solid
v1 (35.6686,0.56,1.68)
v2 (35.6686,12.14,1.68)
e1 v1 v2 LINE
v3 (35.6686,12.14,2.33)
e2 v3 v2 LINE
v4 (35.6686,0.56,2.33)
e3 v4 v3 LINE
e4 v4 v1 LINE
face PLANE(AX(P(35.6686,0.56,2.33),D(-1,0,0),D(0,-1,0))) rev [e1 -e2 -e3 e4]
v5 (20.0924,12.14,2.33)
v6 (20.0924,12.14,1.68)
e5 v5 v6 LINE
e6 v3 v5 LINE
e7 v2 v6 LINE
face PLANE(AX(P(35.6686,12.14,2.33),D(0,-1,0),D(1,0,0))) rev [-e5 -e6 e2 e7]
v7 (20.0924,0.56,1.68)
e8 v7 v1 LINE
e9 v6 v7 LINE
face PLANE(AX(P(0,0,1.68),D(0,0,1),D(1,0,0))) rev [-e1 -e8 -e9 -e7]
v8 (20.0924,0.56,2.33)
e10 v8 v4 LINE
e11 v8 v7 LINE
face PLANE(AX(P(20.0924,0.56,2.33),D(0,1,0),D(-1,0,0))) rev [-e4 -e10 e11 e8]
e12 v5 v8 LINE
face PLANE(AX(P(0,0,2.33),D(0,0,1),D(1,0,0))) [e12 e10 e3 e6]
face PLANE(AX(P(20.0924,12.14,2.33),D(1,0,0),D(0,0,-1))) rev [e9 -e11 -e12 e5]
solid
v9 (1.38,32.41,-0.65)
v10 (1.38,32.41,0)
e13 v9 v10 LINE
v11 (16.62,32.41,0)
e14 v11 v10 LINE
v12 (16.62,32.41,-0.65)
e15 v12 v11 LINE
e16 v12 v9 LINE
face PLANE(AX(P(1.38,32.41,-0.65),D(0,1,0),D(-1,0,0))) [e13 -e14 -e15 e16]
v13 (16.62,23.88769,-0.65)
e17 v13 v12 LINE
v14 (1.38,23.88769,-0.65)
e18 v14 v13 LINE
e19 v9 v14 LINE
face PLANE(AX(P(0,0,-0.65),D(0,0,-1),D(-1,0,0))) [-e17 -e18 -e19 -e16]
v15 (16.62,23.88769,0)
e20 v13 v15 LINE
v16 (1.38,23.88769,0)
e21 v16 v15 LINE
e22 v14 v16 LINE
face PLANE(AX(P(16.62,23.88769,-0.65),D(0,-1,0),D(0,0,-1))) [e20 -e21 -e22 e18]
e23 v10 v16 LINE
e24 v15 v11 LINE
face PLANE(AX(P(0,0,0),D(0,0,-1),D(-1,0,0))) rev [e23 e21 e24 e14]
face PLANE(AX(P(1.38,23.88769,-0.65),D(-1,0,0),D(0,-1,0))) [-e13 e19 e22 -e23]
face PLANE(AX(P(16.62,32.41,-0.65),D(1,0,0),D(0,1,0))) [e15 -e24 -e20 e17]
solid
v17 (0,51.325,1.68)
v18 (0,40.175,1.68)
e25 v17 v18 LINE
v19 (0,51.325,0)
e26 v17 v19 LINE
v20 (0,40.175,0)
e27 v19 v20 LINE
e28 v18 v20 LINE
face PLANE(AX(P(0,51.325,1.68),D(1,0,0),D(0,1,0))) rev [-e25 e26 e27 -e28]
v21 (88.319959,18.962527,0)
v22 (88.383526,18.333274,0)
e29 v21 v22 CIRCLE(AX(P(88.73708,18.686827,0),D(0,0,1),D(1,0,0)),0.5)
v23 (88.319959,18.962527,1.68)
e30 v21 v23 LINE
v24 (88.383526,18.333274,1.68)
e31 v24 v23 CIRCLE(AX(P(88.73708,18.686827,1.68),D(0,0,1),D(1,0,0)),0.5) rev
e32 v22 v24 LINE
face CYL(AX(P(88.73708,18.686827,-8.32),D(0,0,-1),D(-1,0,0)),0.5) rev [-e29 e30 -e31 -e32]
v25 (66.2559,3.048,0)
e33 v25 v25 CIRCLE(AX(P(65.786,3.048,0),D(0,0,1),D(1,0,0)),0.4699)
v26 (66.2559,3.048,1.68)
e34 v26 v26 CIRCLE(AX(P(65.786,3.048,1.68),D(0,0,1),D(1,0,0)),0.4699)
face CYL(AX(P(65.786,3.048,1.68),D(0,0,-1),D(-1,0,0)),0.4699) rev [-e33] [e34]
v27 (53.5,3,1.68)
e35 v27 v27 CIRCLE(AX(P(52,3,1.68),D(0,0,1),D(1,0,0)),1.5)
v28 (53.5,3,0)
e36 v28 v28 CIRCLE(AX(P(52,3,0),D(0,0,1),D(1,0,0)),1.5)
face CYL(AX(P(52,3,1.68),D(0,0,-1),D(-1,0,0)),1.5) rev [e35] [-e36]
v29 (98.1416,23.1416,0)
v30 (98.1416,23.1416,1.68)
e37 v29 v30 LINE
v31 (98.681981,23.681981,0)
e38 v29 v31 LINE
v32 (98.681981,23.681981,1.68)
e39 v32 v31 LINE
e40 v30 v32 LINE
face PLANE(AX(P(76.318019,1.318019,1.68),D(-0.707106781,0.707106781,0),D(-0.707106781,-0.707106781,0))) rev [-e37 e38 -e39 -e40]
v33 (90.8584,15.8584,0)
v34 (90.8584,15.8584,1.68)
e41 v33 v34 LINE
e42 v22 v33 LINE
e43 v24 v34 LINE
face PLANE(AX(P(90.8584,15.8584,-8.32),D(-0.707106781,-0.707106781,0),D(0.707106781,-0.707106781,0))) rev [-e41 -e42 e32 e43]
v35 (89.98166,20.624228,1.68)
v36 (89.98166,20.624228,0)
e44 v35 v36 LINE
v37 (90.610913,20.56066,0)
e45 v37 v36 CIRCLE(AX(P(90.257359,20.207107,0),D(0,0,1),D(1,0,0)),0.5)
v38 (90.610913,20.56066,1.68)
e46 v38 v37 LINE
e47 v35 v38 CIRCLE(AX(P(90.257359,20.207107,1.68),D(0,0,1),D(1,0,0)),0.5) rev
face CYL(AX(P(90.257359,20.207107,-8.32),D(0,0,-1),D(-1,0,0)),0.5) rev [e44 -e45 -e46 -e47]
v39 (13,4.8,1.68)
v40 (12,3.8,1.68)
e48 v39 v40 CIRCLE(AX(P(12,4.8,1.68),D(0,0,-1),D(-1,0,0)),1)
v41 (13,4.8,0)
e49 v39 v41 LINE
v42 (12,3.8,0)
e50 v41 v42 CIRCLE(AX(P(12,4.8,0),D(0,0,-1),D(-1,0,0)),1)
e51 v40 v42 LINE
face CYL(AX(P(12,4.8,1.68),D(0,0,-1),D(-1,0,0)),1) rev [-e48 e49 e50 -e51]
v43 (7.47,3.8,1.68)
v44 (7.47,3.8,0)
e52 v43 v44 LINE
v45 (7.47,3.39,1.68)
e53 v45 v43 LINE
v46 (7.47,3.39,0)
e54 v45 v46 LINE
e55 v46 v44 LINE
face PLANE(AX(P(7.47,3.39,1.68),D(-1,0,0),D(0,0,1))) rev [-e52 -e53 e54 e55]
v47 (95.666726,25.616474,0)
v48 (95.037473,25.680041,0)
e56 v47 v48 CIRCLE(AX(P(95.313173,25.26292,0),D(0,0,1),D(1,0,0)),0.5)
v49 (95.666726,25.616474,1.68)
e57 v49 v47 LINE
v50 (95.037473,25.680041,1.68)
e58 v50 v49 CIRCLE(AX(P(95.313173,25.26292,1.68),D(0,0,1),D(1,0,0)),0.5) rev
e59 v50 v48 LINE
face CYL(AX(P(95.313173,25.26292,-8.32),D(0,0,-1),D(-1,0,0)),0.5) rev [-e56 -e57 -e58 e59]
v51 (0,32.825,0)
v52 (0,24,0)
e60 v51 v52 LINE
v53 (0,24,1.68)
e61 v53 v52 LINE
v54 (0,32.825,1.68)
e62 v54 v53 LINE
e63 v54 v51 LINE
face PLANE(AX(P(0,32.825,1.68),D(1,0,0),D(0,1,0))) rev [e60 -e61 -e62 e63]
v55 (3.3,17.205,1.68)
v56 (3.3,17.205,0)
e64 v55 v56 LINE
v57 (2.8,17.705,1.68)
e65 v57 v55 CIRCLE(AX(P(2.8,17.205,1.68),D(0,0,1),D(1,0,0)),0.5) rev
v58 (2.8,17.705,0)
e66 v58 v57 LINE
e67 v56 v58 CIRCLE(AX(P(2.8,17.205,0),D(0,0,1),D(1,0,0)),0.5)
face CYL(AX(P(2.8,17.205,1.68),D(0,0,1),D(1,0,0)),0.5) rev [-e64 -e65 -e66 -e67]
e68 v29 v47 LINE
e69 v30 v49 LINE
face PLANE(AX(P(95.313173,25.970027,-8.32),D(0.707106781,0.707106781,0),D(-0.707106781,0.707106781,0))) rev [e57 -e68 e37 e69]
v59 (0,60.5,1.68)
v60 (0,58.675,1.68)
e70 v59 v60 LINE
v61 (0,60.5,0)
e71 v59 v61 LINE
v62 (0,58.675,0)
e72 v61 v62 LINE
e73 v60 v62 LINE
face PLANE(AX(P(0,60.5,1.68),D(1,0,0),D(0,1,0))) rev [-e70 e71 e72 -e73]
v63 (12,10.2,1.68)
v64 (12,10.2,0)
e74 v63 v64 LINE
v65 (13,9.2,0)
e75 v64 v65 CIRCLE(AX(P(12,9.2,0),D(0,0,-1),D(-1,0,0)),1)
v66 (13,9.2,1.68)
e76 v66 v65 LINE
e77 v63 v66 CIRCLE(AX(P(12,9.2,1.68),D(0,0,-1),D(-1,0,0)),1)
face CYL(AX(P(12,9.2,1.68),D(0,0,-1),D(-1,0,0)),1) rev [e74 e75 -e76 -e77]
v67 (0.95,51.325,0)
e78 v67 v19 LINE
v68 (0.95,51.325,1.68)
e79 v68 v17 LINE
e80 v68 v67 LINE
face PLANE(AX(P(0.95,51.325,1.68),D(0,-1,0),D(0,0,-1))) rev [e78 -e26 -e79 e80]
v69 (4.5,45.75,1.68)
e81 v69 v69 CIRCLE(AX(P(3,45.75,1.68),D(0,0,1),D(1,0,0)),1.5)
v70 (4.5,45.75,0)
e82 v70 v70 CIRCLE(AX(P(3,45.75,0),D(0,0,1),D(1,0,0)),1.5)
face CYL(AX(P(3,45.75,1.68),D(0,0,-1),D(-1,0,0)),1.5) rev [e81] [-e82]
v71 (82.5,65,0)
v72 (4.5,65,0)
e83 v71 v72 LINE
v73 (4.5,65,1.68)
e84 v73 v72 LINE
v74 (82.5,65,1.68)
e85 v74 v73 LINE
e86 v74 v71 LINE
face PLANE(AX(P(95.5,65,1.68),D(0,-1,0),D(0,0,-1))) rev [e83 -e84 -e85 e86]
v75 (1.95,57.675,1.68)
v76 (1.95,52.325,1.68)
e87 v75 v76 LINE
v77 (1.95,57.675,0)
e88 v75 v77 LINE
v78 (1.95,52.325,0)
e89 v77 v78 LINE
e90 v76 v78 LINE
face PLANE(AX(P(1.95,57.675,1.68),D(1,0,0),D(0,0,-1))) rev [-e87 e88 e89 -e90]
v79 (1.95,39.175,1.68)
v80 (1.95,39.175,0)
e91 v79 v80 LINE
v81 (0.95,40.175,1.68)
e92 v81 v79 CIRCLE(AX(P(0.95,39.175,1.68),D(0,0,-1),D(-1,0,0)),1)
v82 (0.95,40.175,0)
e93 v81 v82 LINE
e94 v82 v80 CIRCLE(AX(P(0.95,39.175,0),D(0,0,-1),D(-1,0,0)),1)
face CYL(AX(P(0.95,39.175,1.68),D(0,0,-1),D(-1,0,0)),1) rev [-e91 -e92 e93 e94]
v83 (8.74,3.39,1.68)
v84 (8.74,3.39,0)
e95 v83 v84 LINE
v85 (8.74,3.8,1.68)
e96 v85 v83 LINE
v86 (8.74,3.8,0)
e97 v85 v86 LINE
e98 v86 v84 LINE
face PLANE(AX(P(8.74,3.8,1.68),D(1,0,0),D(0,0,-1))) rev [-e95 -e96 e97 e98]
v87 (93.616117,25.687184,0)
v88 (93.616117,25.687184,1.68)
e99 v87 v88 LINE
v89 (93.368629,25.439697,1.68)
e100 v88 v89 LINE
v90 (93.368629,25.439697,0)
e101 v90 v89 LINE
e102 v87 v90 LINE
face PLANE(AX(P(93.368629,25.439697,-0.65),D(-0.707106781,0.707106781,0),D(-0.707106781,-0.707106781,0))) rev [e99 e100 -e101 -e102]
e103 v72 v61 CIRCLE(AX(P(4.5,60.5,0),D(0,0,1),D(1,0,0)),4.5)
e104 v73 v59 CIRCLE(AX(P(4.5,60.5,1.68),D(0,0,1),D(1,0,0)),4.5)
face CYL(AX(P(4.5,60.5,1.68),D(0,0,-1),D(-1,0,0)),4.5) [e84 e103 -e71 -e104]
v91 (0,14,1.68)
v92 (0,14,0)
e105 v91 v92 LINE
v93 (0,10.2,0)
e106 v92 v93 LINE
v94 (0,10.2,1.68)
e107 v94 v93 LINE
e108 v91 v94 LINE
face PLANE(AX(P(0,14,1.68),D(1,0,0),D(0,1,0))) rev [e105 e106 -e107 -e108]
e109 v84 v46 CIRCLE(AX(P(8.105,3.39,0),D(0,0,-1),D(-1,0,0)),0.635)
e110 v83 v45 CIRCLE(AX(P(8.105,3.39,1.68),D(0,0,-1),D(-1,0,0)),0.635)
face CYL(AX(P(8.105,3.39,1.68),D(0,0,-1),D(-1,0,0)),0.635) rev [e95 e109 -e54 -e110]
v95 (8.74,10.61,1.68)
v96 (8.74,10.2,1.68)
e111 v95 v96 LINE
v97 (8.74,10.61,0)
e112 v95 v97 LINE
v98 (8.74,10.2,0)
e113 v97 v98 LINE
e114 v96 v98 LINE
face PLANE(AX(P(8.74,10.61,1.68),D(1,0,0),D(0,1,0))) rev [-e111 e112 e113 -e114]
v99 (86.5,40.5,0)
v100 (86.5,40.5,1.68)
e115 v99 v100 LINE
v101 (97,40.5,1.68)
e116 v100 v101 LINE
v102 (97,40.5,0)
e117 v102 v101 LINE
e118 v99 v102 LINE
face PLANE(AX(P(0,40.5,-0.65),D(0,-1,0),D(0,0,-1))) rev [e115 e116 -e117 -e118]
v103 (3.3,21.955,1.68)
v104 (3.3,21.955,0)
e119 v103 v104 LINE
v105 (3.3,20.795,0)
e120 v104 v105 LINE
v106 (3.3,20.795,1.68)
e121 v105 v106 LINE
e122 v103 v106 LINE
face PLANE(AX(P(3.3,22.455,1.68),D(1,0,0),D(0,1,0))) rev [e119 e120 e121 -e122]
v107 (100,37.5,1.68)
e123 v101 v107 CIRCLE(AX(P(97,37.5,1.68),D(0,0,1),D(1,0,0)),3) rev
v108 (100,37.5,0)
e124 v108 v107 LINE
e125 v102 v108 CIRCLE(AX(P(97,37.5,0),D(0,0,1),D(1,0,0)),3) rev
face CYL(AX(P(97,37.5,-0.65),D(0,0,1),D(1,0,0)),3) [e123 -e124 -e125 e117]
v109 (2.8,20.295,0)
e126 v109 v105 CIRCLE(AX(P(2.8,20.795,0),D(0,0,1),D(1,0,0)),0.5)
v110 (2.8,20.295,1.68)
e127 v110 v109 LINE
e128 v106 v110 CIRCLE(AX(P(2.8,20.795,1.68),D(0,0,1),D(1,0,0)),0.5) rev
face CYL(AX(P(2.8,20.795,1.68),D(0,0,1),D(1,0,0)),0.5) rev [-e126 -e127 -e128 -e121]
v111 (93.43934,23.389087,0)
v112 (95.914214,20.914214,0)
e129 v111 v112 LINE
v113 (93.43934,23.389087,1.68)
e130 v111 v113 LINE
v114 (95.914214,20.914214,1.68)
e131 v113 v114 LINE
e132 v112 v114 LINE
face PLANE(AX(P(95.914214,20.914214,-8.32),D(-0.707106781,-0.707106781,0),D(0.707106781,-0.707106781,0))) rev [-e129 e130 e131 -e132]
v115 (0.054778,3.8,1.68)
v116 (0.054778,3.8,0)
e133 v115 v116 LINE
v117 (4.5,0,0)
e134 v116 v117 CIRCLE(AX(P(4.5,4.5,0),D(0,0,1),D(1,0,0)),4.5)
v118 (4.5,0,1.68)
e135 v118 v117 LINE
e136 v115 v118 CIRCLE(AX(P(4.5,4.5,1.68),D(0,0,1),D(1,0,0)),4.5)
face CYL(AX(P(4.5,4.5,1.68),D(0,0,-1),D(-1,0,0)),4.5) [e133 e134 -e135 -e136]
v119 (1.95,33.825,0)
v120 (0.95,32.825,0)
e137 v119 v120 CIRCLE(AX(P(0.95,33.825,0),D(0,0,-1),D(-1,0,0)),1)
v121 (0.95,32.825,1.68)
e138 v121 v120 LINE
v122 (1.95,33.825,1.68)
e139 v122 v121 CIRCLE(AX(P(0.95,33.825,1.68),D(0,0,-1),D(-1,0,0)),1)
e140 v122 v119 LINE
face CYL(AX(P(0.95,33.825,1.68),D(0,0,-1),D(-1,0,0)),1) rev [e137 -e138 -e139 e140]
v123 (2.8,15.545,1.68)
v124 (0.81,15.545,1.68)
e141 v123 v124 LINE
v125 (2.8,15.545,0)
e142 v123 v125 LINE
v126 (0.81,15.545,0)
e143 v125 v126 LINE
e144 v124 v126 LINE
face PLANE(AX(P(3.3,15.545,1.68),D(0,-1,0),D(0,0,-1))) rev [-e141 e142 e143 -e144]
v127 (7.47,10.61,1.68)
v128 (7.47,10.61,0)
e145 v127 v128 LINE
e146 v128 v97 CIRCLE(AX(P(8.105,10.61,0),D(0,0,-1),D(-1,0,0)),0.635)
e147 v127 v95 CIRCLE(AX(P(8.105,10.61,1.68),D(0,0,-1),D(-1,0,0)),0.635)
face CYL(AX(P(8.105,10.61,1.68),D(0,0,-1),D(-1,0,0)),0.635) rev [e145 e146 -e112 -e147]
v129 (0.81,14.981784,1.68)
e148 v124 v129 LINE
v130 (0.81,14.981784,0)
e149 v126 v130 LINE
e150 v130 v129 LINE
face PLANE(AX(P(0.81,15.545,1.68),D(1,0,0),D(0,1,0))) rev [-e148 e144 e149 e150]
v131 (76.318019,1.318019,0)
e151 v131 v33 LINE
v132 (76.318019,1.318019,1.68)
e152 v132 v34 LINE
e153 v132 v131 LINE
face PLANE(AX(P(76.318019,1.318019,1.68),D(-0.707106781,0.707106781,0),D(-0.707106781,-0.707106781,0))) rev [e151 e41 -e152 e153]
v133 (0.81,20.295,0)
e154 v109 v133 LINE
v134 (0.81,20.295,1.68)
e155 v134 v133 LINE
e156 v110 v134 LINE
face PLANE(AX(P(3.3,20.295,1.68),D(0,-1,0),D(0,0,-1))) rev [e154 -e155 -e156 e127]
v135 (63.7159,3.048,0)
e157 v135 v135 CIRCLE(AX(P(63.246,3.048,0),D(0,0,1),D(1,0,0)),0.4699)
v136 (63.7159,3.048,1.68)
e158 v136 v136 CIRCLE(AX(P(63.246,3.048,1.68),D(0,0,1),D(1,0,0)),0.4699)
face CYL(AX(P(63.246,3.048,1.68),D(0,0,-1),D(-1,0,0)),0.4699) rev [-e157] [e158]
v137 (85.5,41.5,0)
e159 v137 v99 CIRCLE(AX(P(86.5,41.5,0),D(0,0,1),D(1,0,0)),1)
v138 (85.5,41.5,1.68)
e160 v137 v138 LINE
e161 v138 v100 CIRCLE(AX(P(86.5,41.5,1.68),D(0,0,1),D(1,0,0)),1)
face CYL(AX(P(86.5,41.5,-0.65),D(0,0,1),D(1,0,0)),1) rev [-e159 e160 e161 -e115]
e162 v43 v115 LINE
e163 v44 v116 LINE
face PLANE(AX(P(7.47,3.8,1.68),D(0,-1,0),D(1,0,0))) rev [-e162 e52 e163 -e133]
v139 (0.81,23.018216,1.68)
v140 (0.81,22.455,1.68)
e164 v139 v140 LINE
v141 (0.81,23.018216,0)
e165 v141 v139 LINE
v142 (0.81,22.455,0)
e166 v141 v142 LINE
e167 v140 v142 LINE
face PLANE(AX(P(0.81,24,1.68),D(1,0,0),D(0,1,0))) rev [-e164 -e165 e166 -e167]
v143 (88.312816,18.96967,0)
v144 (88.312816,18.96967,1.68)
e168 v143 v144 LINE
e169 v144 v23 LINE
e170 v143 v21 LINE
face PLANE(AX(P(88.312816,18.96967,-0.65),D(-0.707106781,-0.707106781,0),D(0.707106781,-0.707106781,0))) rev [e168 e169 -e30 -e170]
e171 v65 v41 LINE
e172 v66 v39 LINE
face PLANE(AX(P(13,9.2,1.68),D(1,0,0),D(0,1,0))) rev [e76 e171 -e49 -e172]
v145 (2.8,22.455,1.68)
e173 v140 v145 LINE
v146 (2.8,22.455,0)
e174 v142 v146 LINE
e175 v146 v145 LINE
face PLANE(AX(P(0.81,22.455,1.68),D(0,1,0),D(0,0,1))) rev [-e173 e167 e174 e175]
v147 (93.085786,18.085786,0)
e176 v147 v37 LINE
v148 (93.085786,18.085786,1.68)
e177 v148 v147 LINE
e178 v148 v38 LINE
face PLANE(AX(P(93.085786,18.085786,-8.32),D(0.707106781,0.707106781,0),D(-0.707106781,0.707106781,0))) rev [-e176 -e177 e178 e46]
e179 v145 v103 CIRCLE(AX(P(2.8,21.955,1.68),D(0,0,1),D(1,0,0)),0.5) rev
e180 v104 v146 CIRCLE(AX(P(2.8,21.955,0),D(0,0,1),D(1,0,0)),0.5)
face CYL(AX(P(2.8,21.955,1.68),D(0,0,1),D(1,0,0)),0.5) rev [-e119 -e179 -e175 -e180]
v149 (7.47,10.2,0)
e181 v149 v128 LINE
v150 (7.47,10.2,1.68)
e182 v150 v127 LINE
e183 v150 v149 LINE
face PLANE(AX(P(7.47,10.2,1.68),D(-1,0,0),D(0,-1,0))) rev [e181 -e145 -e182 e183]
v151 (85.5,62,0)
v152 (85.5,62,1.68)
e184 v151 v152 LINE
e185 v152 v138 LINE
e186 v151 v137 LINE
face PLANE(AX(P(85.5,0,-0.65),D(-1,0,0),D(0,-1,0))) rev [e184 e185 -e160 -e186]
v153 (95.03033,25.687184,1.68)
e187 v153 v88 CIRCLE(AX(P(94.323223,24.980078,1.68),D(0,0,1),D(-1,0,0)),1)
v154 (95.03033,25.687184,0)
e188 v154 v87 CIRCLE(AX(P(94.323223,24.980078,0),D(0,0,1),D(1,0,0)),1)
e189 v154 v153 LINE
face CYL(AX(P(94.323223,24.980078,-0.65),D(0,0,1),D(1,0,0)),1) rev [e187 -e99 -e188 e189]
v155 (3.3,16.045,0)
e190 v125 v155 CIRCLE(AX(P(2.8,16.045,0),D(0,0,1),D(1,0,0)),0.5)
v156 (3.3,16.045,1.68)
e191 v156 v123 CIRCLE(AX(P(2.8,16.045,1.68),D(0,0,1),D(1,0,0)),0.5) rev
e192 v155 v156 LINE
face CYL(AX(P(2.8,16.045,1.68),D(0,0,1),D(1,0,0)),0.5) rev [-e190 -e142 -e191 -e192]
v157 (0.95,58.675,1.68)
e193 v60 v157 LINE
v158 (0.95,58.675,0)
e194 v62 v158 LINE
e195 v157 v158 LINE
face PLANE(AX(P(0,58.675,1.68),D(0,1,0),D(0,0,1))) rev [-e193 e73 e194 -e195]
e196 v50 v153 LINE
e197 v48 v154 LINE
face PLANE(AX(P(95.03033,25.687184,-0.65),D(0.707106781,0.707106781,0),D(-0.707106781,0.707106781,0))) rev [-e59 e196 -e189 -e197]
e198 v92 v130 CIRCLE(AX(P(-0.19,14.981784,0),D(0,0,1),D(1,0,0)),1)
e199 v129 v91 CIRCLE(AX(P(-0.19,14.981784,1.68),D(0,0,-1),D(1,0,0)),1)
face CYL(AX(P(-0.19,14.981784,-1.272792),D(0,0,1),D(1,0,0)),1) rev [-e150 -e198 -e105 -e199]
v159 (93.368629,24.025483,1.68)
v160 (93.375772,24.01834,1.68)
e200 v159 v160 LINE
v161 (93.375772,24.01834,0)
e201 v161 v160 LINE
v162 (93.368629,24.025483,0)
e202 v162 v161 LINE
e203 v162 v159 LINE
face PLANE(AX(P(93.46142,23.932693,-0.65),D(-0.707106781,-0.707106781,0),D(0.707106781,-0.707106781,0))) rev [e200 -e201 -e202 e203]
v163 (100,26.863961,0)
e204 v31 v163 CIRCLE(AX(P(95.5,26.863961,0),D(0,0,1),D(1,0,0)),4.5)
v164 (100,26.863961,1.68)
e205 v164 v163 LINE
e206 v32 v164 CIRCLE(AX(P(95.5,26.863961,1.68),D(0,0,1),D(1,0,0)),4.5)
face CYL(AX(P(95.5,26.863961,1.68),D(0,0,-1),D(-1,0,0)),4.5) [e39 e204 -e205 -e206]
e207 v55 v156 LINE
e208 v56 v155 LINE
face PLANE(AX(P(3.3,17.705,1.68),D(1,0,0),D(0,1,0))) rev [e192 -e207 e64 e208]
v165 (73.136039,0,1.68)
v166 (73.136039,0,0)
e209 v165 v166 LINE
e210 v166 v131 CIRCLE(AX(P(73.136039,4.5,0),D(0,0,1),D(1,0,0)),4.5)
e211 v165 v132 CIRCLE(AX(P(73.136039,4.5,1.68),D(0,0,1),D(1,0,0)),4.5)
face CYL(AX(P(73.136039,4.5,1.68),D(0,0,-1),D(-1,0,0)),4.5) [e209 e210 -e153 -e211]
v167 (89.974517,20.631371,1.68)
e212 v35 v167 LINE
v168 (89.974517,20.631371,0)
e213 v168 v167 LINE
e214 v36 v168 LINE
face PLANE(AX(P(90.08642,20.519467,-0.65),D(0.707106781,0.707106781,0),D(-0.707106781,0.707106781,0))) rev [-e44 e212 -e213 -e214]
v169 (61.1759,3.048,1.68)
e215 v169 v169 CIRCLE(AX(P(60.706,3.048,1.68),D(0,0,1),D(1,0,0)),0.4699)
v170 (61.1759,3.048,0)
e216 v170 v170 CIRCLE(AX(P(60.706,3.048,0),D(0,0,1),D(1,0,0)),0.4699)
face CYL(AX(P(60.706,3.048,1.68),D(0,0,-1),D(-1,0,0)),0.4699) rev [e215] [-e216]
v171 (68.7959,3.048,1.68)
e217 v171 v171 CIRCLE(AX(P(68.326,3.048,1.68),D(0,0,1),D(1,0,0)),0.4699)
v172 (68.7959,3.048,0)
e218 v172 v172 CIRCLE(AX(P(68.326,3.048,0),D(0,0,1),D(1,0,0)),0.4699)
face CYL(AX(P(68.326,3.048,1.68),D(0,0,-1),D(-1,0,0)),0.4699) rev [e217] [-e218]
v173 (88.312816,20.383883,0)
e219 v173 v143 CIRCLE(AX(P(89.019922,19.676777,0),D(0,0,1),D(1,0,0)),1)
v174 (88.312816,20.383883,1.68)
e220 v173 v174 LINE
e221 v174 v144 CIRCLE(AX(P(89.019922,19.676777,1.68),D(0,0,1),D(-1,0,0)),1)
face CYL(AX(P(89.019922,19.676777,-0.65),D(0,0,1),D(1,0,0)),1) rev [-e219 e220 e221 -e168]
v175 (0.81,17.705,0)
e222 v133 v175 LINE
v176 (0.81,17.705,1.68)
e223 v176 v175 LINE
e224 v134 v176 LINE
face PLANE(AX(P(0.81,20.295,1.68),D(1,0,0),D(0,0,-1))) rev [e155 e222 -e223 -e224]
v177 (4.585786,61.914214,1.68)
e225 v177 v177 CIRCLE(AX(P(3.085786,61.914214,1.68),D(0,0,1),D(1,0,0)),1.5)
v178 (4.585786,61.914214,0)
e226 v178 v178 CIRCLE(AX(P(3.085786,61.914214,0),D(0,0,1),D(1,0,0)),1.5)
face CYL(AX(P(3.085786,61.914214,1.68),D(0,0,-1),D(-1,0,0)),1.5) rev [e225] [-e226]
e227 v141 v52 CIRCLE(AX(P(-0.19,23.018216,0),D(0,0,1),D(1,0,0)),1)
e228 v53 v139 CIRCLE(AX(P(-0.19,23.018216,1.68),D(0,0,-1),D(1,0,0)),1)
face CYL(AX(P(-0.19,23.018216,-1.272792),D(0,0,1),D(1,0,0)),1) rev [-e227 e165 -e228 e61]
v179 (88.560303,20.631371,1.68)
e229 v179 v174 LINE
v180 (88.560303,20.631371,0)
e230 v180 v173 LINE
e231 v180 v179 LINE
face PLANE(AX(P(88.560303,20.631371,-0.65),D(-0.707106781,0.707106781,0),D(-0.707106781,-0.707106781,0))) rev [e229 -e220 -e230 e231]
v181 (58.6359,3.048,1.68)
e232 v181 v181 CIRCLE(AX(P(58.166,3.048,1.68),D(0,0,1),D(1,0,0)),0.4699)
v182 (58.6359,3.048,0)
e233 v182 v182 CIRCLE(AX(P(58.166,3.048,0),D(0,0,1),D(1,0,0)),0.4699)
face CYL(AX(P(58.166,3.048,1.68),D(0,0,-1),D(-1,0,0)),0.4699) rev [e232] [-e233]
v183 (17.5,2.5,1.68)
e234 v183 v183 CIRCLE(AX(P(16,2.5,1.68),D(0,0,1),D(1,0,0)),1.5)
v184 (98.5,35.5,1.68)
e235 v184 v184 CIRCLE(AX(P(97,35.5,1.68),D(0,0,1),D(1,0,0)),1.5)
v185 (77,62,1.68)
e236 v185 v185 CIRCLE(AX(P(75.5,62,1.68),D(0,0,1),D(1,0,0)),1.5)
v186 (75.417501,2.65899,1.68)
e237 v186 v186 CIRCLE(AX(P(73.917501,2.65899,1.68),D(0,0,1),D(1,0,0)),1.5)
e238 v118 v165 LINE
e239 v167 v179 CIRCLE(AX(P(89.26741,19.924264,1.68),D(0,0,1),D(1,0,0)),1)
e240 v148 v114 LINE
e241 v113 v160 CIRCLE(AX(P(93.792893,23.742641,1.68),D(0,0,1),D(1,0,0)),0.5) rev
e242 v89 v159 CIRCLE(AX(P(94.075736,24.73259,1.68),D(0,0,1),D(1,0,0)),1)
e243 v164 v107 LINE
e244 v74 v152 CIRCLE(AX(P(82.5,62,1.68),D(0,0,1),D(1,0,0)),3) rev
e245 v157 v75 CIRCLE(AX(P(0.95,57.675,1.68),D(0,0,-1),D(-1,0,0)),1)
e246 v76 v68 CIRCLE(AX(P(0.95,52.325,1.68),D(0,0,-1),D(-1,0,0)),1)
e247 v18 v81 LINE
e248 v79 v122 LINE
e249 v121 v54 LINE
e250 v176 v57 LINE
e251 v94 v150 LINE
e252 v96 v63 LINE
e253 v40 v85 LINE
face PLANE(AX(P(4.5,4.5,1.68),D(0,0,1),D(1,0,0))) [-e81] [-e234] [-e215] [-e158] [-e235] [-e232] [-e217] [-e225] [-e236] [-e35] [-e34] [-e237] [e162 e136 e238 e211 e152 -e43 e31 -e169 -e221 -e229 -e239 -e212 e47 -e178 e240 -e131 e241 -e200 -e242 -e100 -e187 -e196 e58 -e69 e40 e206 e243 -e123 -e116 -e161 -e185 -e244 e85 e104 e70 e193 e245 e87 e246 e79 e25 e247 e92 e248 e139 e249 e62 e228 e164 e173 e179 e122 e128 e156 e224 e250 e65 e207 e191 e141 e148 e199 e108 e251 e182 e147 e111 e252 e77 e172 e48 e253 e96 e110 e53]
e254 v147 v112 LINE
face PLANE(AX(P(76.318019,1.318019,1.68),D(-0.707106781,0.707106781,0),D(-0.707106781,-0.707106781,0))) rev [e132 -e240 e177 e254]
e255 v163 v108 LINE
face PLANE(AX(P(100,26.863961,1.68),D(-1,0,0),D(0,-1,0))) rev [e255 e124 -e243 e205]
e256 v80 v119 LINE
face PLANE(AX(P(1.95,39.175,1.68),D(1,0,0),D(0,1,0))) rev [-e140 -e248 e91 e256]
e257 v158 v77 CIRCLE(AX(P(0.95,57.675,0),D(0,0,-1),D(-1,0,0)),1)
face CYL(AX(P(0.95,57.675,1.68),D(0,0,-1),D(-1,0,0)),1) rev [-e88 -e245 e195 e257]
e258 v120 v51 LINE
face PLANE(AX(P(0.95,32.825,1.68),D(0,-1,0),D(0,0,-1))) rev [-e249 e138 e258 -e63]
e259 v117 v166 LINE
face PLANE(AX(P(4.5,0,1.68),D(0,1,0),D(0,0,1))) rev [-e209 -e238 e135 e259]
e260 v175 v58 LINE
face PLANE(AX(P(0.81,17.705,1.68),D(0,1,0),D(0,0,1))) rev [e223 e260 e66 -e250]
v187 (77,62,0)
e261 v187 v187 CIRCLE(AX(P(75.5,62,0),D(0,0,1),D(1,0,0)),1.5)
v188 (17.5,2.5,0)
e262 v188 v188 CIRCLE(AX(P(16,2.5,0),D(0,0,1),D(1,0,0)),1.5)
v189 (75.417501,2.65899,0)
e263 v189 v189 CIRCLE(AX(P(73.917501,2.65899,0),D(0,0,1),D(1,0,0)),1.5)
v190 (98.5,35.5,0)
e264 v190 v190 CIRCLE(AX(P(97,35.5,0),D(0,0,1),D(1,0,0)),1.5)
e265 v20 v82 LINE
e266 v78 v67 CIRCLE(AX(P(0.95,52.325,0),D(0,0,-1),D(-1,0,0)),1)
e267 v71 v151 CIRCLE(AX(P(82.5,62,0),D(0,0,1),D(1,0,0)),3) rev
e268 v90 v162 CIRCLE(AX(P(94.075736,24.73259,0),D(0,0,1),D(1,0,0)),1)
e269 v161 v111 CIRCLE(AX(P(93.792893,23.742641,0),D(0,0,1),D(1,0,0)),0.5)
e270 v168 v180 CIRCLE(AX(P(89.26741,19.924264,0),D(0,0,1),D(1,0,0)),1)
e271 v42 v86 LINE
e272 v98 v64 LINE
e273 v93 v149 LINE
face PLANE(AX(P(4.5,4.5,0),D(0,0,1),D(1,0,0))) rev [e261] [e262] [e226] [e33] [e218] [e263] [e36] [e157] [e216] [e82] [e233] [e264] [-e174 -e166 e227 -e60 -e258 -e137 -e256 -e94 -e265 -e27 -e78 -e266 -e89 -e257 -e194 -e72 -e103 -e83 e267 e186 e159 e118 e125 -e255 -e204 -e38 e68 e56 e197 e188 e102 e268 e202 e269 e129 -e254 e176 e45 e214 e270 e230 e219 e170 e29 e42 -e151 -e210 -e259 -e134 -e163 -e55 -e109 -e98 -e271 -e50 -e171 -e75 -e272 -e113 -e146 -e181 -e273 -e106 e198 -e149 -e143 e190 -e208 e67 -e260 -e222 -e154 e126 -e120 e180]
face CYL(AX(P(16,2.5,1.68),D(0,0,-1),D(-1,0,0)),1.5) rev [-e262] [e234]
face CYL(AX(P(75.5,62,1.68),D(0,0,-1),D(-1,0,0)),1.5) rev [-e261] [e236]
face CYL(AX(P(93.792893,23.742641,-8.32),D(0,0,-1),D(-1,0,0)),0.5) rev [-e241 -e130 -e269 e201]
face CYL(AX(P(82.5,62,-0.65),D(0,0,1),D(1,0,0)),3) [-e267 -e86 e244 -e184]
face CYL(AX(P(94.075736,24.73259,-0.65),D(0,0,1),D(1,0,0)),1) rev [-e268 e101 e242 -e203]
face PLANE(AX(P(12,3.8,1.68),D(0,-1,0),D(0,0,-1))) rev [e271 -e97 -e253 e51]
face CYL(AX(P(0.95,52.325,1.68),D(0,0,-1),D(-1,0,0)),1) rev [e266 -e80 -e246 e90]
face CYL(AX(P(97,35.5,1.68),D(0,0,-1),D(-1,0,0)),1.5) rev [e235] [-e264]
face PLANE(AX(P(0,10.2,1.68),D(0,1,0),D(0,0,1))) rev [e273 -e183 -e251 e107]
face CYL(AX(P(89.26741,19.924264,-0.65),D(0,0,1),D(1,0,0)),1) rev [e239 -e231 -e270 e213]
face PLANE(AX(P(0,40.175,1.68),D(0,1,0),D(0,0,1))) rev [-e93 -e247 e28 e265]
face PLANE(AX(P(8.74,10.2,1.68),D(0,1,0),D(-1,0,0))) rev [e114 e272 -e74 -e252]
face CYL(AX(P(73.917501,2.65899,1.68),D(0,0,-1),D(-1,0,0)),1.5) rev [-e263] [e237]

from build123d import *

# Parameters (mm, degrees)
BOARD_DEPTH                                   = 1.68
SKETCH2_R                                     = 1.5
SKETCH2_R_2                                   = 0.4699
PLATED_HOLES_DEPTH                            = 120.280435948
SKETCH85_W                                    = 15.24
SKETCH85_H                                    = 8.52231
T4_1_KK81_1_DEPTH                             = 0.65
SKETCH327_W                                   = 15.5762
SKETCH327_H                                   = 11.58
SPEAKER_SMT_WATERPROOF_2403_260_00107_1_DEPTH = 0.65
CUT_EXTRUDE1_DEPTH                            = 120.29136138
CUT_EXTRUDE1_DEPTH_BACK                       = 120.29136138
FILLET1_DEPTH                                 = 1.68
BOSS_EXTRUDE1_DEPTH                           = 1.68
CUT_EXTRUDE5_START                            = -1
CUT_EXTRUDE5_DEPTH                            = 4
CUT_EXTRUDE5_2_DEPTH                          = 1.68


with BuildPart() as part:
    # Sketch1 → BOARD (new body)
    with BuildSketch(Plane.XY):
        with BuildLine():
            Line((4.5, 0), (73.136038969, 0))
            ThreePointArc((73.136038969, 0), (74.858114415, 0.342542104), (76.318019485, 1.318019485))
            Line((76.318019485, 1.318019485), (98.681980515, 23.681980515))
            ThreePointArc((98.681980515, 23.681980515), (99.657457896, 25.141885585), (100, 26.863961031))
            Line((100, 26.863961031), (100, 60.5))
            ThreePointArc((100, 60.5), (98.681980515, 63.681980515), (95.5, 65))
            Line((95.5, 65), (4.5, 65))
            ThreePointArc((4.5, 65), (1.318019485, 63.681980515), (0, 60.5))
            Line((0, 60.5), (0, 58.675))
            Line((0, 58.675), (0.95, 58.675))
            ThreePointArc((0.95, 58.675), (1.657106781, 58.382106781), (1.95, 57.675))
            Line((1.95, 57.675), (1.95, 52.325))
            ThreePointArc((1.95, 52.325), (1.657106781, 51.617893219), (0.95, 51.325))
            Line((0.95, 51.325), (0, 51.325))
            Line((0, 51.325), (0, 40.175))
            Line((0, 40.175), (0.95, 40.175))
            ThreePointArc((0.95, 40.175), (1.657106781, 39.882106781), (1.95, 39.175))
            Line((1.95, 39.175), (1.95, 33.825))
            ThreePointArc((1.95, 33.825), (1.657106781, 33.117893219), (0.95, 32.825))
            Line((0.95, 32.825), (0, 32.825))
            Line((0, 32.825), (0, 24))
            Line((0, 24), (0.81, 24))
            Line((0.81, 24), (0.81, 22.455))
            Line((0.81, 22.455), (3.3, 22.455))
            Line((3.3, 22.455), (3.3, 20.295))
            Line((3.3, 20.295), (0.81, 20.295))
            Line((0.81, 20.295), (0.81, 17.705))
            Line((0.81, 17.705), (3.3, 17.705))
            Line((3.3, 17.705), (3.3, 15.545))
            Line((3.3, 15.545), (0.81, 15.545))
            Line((0.81, 15.545), (0.81, 14))
            Line((0.81, 14), (0, 14))
            Line((0, 14), (0, 10.2))
            Line((0, 10.2), (7.47, 10.2))
            Line((7.47, 10.2), (7.47, 10.61))
            ThreePointArc((7.47, 10.61), (8.105, 11.245), (8.74, 10.61))
            Line((8.74, 10.61), (8.74, 10.2))
            Line((8.74, 10.2), (12, 10.2))
            ThreePointArc((12, 10.2), (12.707106781, 9.907106781), (13, 9.2))
            Line((13, 9.2), (13, 4.8))
            ThreePointArc((13, 4.8), (12.707106781, 4.092893219), (12, 3.8))
            Line((12, 3.8), (8.74, 3.8))
            Line((8.74, 3.8), (8.74, 3.39))
            ThreePointArc((8.74, 3.39), (8.105, 2.755), (7.47, 3.39))
            Line((7.47, 3.39), (7.47, 3.8))
            Line((7.47, 3.8), (0.054777846, 3.8))
            ThreePointArc((0.054777846, 3.8), (1.575961697, 1.079473725), (4.5, 0))
        make_face()
    extrude(amount=BOARD_DEPTH)

    # Sketch2 → PLATED HOLES (cut, through all)
    with BuildSketch(Plane.XY):
        with Locations((97, 35.5)):
            Circle(SKETCH2_R)
        with Locations((65.786, 3.048)):
            Circle(SKETCH2_R_2)
        with Locations((60.706, 3.048)):
            Circle(SKETCH2_R_2)
        with Locations((58.166, 3.048)):
            Circle(SKETCH2_R_2)
        with Locations((63.246, 3.048)):
            Circle(SKETCH2_R_2)
        with Locations((52, 3)):
            Circle(SKETCH2_R)
        with Locations((68.326, 3.048)):
            Circle(SKETCH2_R_2)
        with Locations((16, 2.5)):
            Circle(SKETCH2_R)
        with Locations((73.917501226, 2.658990293)):
            Circle(SKETCH2_R)
        with Locations((3, 45.75)):
            Circle(SKETCH2_R)
        with Locations((3.085786438, 61.914213562)):
            Circle(SKETCH2_R)
        with Locations((75.5, 62)):
            Circle(SKETCH2_R)
    extrude(amount=PLATED_HOLES_DEPTH, mode=Mode.SUBTRACT)

    # Sketch370 → Cut-Extrude1 (cut, two sides: drawn at the far end of the back side and taken through both)
    with BuildSketch(Plane.XY.offset(1.68).offset(-CUT_EXTRUDE1_DEPTH_BACK)):
        with BuildLine():
            ThreePointArc((82.5, 65), (84.621320344, 64.121320344), (85.5, 62))
            Line((85.5, 62), (85.5, 41.5))
            ThreePointArc((85.5, 41.5), (85.792893219, 40.792893219), (86.5, 40.5))
            Line((86.5, 40.5), (97, 40.5))
            ThreePointArc((97, 40.5), (99.121320344, 39.621320344), (100, 37.5))
            Line((100, 37.5), (100, 60.5))
            ThreePointArc((100, 60.5), (98.681980515, 63.681980515), (95.5, 65))
            Line((95.5, 65), (82.5, 65))
        make_face()
    extrude(amount=CUT_EXTRUDE1_DEPTH + CUT_EXTRUDE1_DEPTH_BACK, mode=Mode.SUBTRACT)

    # Fillet1: read off the stored shape, not the designer's step
    # Fillet1 outline → Fillet1 (cut)
    with BuildSketch(Plane.XY):
        with BuildLine():
            ThreePointArc((90.610912703, 20.560660172), (90.257359313, 20.707106781), (89.903805922, 20.560660172))
            Line((89.903805922, 20.560660172), (88.383526343, 19.040380592))
            ThreePointArc((88.383526343, 19.040380592), (88.237079733, 18.686827202), (88.383526343, 18.333273811))
            Line((88.383526343, 18.333273811), (90.858400077, 15.858400077))
            Line((90.858400077, 15.858400077), (93.085786438, 18.085786438))
            Line((93.085786438, 18.085786438), (90.610912703, 20.560660172))
        make_face()
        with BuildLine():
            Line((93.439339828, 23.389087297), (95.914213562, 20.914213562))
            Line((95.914213562, 20.914213562), (98.141599923, 23.141599923))
            Line((98.141599923, 23.141599923), (95.666726189, 25.616473657))
            ThreePointArc((95.666726189, 25.616473657), (95.313172799, 25.762920267), (94.959619408, 25.616473657))
            Line((94.959619408, 25.616473657), (93.439339828, 24.096194078))
            ThreePointArc((93.439339828, 24.096194078), (93.292893219, 23.742640687), (93.439339828, 23.389087297))
        make_face()
    extrude(amount=FILLET1_DEPTH, mode=Mode.SUBTRACT)

    # Sketch373 → Boss-Extrude1 (add)
    with BuildSketch(Plane.XY.offset(1.68)):
        with BuildLine():
            Line((0, 24), (0.81, 24))
            Line((0.81, 24), (0.81, 23.01821591))
            ThreePointArc((0.81, 23.01821591), (0.581362431, 23.654612013), (0, 24))
        make_face()
        with BuildLine():
            Line((0.81, 14.98178409), (0.81, 14))
            Line((0.81, 14), (0, 14))
            ThreePointArc((0, 14), (0.581362431, 14.345387987), (0.81, 14.98178409))
        make_face()
    extrude(amount=-BOSS_EXTRUDE1_DEPTH)

    # Cut-Extrude5: read off the stored shape, not the designer's step
    # Cut-Extrude5 outline → Cut-Extrude5 (cut)
    with BuildSketch(Plane.XY.offset(CUT_EXTRUDE5_START)):
        with BuildLine():
            Line((88.560303038, 20.63137085), (88.312815665, 20.383883476))
            ThreePointArc((88.312815665, 20.383883476), (88.019922446, 19.676776695), (88.312815665, 18.969669914))
            Line((88.312815665, 18.969669914), (88.319958894, 18.962526685))
            ThreePointArc((88.319958894, 18.962526685), (88.349781399, 19.003054968), (88.383526343, 19.040380592))
            Line((88.383526343, 19.040380592), (89.903805922, 20.560660172))
            ThreePointArc((89.903805922, 20.560660172), (89.941131547, 20.594405116), (89.981659829, 20.624227621))
            Line((89.981659829, 20.624227621), (89.9745166, 20.63137085))
            ThreePointArc((89.9745166, 20.63137085), (89.267409819, 20.924264069), (88.560303038, 20.63137085))
        make_face()
        with BuildLine():
            ThreePointArc((95.030330086, 25.687184335), (94.323223305, 25.980077554), (93.616116524, 25.687184335))
            Line((93.616116524, 25.687184335), (93.36862915, 25.439696962))
            ThreePointArc((93.36862915, 25.439696962), (93.075735931, 24.732590181), (93.36862915, 24.0254834))
            Line((93.36862915, 24.0254834), (93.375772379, 24.018340171))
            ThreePointArc((93.375772379, 24.018340171), (93.405594884, 24.058868453), (93.439339828, 24.096194078))
            Line((93.439339828, 24.096194078), (94.959619408, 25.616473657))
            ThreePointArc((94.959619408, 25.616473657), (94.996945032, 25.650218601), (95.037473315, 25.680041106))
            Line((95.037473315, 25.680041106), (95.030330086, 25.687184335))
        make_face()
    extrude(amount=CUT_EXTRUDE5_DEPTH, mode=Mode.SUBTRACT)

    # Cut-Extrude5 2 outline → Cut-Extrude5 2 (add)
    with BuildSketch(Plane.XY):
        with BuildLine():
            ThreePointArc((2.8, 17.705), (3.153553391, 17.558553391), (3.3, 17.205))
            Line((3.3, 17.205), (3.3, 17.705))
            Line((3.3, 17.705), (2.8, 17.705))
        make_face()
        with BuildLine():
            ThreePointArc((3.3, 16.045), (3.153553391, 15.691446609), (2.8, 15.545))
            Line((2.8, 15.545), (3.3, 15.545))
            Line((3.3, 15.545), (3.3, 16.045))
        make_face()
        with BuildLine():
            ThreePointArc((2.8, 22.455), (3.153553391, 22.308553391), (3.3, 21.955))
            Line((3.3, 21.955), (3.3, 22.455))
            Line((3.3, 22.455), (2.8, 22.455))
        make_face()
        with BuildLine():
            ThreePointArc((3.3, 20.795), (3.153553391, 20.441446609), (2.8, 20.295))
            Line((2.8, 20.295), (3.3, 20.295))
            Line((3.3, 20.295), (3.3, 20.795))
        make_face()
    extrude(amount=CUT_EXTRUDE5_2_DEPTH)


with BuildPart() as body_2:
    # Sketch85 → T4-1-KK81-1 (new body)
    with BuildSketch(Plane.XY):
        with Locations((9, 28.148845)):
            Rectangle(SKETCH85_W, SKETCH85_H)
    extrude(amount=-T4_1_KK81_1_DEPTH)


with BuildPart() as body_3:
    # Sketch327 → SPEAKER_SMT_WATERPROOF_2403-260-00107-1 (new body)
    with BuildSketch(Plane.XY.offset(1.68)):
        with Locations((27.8805, 6.35)):
            Rectangle(SKETCH327_W, SKETCH327_H)
    extrude(amount=SPEAKER_SMT_WATERPROOF_2403_260_00107_1_DEPTH)


solid = Compound([part.part, body_2.part, body_3.part])
